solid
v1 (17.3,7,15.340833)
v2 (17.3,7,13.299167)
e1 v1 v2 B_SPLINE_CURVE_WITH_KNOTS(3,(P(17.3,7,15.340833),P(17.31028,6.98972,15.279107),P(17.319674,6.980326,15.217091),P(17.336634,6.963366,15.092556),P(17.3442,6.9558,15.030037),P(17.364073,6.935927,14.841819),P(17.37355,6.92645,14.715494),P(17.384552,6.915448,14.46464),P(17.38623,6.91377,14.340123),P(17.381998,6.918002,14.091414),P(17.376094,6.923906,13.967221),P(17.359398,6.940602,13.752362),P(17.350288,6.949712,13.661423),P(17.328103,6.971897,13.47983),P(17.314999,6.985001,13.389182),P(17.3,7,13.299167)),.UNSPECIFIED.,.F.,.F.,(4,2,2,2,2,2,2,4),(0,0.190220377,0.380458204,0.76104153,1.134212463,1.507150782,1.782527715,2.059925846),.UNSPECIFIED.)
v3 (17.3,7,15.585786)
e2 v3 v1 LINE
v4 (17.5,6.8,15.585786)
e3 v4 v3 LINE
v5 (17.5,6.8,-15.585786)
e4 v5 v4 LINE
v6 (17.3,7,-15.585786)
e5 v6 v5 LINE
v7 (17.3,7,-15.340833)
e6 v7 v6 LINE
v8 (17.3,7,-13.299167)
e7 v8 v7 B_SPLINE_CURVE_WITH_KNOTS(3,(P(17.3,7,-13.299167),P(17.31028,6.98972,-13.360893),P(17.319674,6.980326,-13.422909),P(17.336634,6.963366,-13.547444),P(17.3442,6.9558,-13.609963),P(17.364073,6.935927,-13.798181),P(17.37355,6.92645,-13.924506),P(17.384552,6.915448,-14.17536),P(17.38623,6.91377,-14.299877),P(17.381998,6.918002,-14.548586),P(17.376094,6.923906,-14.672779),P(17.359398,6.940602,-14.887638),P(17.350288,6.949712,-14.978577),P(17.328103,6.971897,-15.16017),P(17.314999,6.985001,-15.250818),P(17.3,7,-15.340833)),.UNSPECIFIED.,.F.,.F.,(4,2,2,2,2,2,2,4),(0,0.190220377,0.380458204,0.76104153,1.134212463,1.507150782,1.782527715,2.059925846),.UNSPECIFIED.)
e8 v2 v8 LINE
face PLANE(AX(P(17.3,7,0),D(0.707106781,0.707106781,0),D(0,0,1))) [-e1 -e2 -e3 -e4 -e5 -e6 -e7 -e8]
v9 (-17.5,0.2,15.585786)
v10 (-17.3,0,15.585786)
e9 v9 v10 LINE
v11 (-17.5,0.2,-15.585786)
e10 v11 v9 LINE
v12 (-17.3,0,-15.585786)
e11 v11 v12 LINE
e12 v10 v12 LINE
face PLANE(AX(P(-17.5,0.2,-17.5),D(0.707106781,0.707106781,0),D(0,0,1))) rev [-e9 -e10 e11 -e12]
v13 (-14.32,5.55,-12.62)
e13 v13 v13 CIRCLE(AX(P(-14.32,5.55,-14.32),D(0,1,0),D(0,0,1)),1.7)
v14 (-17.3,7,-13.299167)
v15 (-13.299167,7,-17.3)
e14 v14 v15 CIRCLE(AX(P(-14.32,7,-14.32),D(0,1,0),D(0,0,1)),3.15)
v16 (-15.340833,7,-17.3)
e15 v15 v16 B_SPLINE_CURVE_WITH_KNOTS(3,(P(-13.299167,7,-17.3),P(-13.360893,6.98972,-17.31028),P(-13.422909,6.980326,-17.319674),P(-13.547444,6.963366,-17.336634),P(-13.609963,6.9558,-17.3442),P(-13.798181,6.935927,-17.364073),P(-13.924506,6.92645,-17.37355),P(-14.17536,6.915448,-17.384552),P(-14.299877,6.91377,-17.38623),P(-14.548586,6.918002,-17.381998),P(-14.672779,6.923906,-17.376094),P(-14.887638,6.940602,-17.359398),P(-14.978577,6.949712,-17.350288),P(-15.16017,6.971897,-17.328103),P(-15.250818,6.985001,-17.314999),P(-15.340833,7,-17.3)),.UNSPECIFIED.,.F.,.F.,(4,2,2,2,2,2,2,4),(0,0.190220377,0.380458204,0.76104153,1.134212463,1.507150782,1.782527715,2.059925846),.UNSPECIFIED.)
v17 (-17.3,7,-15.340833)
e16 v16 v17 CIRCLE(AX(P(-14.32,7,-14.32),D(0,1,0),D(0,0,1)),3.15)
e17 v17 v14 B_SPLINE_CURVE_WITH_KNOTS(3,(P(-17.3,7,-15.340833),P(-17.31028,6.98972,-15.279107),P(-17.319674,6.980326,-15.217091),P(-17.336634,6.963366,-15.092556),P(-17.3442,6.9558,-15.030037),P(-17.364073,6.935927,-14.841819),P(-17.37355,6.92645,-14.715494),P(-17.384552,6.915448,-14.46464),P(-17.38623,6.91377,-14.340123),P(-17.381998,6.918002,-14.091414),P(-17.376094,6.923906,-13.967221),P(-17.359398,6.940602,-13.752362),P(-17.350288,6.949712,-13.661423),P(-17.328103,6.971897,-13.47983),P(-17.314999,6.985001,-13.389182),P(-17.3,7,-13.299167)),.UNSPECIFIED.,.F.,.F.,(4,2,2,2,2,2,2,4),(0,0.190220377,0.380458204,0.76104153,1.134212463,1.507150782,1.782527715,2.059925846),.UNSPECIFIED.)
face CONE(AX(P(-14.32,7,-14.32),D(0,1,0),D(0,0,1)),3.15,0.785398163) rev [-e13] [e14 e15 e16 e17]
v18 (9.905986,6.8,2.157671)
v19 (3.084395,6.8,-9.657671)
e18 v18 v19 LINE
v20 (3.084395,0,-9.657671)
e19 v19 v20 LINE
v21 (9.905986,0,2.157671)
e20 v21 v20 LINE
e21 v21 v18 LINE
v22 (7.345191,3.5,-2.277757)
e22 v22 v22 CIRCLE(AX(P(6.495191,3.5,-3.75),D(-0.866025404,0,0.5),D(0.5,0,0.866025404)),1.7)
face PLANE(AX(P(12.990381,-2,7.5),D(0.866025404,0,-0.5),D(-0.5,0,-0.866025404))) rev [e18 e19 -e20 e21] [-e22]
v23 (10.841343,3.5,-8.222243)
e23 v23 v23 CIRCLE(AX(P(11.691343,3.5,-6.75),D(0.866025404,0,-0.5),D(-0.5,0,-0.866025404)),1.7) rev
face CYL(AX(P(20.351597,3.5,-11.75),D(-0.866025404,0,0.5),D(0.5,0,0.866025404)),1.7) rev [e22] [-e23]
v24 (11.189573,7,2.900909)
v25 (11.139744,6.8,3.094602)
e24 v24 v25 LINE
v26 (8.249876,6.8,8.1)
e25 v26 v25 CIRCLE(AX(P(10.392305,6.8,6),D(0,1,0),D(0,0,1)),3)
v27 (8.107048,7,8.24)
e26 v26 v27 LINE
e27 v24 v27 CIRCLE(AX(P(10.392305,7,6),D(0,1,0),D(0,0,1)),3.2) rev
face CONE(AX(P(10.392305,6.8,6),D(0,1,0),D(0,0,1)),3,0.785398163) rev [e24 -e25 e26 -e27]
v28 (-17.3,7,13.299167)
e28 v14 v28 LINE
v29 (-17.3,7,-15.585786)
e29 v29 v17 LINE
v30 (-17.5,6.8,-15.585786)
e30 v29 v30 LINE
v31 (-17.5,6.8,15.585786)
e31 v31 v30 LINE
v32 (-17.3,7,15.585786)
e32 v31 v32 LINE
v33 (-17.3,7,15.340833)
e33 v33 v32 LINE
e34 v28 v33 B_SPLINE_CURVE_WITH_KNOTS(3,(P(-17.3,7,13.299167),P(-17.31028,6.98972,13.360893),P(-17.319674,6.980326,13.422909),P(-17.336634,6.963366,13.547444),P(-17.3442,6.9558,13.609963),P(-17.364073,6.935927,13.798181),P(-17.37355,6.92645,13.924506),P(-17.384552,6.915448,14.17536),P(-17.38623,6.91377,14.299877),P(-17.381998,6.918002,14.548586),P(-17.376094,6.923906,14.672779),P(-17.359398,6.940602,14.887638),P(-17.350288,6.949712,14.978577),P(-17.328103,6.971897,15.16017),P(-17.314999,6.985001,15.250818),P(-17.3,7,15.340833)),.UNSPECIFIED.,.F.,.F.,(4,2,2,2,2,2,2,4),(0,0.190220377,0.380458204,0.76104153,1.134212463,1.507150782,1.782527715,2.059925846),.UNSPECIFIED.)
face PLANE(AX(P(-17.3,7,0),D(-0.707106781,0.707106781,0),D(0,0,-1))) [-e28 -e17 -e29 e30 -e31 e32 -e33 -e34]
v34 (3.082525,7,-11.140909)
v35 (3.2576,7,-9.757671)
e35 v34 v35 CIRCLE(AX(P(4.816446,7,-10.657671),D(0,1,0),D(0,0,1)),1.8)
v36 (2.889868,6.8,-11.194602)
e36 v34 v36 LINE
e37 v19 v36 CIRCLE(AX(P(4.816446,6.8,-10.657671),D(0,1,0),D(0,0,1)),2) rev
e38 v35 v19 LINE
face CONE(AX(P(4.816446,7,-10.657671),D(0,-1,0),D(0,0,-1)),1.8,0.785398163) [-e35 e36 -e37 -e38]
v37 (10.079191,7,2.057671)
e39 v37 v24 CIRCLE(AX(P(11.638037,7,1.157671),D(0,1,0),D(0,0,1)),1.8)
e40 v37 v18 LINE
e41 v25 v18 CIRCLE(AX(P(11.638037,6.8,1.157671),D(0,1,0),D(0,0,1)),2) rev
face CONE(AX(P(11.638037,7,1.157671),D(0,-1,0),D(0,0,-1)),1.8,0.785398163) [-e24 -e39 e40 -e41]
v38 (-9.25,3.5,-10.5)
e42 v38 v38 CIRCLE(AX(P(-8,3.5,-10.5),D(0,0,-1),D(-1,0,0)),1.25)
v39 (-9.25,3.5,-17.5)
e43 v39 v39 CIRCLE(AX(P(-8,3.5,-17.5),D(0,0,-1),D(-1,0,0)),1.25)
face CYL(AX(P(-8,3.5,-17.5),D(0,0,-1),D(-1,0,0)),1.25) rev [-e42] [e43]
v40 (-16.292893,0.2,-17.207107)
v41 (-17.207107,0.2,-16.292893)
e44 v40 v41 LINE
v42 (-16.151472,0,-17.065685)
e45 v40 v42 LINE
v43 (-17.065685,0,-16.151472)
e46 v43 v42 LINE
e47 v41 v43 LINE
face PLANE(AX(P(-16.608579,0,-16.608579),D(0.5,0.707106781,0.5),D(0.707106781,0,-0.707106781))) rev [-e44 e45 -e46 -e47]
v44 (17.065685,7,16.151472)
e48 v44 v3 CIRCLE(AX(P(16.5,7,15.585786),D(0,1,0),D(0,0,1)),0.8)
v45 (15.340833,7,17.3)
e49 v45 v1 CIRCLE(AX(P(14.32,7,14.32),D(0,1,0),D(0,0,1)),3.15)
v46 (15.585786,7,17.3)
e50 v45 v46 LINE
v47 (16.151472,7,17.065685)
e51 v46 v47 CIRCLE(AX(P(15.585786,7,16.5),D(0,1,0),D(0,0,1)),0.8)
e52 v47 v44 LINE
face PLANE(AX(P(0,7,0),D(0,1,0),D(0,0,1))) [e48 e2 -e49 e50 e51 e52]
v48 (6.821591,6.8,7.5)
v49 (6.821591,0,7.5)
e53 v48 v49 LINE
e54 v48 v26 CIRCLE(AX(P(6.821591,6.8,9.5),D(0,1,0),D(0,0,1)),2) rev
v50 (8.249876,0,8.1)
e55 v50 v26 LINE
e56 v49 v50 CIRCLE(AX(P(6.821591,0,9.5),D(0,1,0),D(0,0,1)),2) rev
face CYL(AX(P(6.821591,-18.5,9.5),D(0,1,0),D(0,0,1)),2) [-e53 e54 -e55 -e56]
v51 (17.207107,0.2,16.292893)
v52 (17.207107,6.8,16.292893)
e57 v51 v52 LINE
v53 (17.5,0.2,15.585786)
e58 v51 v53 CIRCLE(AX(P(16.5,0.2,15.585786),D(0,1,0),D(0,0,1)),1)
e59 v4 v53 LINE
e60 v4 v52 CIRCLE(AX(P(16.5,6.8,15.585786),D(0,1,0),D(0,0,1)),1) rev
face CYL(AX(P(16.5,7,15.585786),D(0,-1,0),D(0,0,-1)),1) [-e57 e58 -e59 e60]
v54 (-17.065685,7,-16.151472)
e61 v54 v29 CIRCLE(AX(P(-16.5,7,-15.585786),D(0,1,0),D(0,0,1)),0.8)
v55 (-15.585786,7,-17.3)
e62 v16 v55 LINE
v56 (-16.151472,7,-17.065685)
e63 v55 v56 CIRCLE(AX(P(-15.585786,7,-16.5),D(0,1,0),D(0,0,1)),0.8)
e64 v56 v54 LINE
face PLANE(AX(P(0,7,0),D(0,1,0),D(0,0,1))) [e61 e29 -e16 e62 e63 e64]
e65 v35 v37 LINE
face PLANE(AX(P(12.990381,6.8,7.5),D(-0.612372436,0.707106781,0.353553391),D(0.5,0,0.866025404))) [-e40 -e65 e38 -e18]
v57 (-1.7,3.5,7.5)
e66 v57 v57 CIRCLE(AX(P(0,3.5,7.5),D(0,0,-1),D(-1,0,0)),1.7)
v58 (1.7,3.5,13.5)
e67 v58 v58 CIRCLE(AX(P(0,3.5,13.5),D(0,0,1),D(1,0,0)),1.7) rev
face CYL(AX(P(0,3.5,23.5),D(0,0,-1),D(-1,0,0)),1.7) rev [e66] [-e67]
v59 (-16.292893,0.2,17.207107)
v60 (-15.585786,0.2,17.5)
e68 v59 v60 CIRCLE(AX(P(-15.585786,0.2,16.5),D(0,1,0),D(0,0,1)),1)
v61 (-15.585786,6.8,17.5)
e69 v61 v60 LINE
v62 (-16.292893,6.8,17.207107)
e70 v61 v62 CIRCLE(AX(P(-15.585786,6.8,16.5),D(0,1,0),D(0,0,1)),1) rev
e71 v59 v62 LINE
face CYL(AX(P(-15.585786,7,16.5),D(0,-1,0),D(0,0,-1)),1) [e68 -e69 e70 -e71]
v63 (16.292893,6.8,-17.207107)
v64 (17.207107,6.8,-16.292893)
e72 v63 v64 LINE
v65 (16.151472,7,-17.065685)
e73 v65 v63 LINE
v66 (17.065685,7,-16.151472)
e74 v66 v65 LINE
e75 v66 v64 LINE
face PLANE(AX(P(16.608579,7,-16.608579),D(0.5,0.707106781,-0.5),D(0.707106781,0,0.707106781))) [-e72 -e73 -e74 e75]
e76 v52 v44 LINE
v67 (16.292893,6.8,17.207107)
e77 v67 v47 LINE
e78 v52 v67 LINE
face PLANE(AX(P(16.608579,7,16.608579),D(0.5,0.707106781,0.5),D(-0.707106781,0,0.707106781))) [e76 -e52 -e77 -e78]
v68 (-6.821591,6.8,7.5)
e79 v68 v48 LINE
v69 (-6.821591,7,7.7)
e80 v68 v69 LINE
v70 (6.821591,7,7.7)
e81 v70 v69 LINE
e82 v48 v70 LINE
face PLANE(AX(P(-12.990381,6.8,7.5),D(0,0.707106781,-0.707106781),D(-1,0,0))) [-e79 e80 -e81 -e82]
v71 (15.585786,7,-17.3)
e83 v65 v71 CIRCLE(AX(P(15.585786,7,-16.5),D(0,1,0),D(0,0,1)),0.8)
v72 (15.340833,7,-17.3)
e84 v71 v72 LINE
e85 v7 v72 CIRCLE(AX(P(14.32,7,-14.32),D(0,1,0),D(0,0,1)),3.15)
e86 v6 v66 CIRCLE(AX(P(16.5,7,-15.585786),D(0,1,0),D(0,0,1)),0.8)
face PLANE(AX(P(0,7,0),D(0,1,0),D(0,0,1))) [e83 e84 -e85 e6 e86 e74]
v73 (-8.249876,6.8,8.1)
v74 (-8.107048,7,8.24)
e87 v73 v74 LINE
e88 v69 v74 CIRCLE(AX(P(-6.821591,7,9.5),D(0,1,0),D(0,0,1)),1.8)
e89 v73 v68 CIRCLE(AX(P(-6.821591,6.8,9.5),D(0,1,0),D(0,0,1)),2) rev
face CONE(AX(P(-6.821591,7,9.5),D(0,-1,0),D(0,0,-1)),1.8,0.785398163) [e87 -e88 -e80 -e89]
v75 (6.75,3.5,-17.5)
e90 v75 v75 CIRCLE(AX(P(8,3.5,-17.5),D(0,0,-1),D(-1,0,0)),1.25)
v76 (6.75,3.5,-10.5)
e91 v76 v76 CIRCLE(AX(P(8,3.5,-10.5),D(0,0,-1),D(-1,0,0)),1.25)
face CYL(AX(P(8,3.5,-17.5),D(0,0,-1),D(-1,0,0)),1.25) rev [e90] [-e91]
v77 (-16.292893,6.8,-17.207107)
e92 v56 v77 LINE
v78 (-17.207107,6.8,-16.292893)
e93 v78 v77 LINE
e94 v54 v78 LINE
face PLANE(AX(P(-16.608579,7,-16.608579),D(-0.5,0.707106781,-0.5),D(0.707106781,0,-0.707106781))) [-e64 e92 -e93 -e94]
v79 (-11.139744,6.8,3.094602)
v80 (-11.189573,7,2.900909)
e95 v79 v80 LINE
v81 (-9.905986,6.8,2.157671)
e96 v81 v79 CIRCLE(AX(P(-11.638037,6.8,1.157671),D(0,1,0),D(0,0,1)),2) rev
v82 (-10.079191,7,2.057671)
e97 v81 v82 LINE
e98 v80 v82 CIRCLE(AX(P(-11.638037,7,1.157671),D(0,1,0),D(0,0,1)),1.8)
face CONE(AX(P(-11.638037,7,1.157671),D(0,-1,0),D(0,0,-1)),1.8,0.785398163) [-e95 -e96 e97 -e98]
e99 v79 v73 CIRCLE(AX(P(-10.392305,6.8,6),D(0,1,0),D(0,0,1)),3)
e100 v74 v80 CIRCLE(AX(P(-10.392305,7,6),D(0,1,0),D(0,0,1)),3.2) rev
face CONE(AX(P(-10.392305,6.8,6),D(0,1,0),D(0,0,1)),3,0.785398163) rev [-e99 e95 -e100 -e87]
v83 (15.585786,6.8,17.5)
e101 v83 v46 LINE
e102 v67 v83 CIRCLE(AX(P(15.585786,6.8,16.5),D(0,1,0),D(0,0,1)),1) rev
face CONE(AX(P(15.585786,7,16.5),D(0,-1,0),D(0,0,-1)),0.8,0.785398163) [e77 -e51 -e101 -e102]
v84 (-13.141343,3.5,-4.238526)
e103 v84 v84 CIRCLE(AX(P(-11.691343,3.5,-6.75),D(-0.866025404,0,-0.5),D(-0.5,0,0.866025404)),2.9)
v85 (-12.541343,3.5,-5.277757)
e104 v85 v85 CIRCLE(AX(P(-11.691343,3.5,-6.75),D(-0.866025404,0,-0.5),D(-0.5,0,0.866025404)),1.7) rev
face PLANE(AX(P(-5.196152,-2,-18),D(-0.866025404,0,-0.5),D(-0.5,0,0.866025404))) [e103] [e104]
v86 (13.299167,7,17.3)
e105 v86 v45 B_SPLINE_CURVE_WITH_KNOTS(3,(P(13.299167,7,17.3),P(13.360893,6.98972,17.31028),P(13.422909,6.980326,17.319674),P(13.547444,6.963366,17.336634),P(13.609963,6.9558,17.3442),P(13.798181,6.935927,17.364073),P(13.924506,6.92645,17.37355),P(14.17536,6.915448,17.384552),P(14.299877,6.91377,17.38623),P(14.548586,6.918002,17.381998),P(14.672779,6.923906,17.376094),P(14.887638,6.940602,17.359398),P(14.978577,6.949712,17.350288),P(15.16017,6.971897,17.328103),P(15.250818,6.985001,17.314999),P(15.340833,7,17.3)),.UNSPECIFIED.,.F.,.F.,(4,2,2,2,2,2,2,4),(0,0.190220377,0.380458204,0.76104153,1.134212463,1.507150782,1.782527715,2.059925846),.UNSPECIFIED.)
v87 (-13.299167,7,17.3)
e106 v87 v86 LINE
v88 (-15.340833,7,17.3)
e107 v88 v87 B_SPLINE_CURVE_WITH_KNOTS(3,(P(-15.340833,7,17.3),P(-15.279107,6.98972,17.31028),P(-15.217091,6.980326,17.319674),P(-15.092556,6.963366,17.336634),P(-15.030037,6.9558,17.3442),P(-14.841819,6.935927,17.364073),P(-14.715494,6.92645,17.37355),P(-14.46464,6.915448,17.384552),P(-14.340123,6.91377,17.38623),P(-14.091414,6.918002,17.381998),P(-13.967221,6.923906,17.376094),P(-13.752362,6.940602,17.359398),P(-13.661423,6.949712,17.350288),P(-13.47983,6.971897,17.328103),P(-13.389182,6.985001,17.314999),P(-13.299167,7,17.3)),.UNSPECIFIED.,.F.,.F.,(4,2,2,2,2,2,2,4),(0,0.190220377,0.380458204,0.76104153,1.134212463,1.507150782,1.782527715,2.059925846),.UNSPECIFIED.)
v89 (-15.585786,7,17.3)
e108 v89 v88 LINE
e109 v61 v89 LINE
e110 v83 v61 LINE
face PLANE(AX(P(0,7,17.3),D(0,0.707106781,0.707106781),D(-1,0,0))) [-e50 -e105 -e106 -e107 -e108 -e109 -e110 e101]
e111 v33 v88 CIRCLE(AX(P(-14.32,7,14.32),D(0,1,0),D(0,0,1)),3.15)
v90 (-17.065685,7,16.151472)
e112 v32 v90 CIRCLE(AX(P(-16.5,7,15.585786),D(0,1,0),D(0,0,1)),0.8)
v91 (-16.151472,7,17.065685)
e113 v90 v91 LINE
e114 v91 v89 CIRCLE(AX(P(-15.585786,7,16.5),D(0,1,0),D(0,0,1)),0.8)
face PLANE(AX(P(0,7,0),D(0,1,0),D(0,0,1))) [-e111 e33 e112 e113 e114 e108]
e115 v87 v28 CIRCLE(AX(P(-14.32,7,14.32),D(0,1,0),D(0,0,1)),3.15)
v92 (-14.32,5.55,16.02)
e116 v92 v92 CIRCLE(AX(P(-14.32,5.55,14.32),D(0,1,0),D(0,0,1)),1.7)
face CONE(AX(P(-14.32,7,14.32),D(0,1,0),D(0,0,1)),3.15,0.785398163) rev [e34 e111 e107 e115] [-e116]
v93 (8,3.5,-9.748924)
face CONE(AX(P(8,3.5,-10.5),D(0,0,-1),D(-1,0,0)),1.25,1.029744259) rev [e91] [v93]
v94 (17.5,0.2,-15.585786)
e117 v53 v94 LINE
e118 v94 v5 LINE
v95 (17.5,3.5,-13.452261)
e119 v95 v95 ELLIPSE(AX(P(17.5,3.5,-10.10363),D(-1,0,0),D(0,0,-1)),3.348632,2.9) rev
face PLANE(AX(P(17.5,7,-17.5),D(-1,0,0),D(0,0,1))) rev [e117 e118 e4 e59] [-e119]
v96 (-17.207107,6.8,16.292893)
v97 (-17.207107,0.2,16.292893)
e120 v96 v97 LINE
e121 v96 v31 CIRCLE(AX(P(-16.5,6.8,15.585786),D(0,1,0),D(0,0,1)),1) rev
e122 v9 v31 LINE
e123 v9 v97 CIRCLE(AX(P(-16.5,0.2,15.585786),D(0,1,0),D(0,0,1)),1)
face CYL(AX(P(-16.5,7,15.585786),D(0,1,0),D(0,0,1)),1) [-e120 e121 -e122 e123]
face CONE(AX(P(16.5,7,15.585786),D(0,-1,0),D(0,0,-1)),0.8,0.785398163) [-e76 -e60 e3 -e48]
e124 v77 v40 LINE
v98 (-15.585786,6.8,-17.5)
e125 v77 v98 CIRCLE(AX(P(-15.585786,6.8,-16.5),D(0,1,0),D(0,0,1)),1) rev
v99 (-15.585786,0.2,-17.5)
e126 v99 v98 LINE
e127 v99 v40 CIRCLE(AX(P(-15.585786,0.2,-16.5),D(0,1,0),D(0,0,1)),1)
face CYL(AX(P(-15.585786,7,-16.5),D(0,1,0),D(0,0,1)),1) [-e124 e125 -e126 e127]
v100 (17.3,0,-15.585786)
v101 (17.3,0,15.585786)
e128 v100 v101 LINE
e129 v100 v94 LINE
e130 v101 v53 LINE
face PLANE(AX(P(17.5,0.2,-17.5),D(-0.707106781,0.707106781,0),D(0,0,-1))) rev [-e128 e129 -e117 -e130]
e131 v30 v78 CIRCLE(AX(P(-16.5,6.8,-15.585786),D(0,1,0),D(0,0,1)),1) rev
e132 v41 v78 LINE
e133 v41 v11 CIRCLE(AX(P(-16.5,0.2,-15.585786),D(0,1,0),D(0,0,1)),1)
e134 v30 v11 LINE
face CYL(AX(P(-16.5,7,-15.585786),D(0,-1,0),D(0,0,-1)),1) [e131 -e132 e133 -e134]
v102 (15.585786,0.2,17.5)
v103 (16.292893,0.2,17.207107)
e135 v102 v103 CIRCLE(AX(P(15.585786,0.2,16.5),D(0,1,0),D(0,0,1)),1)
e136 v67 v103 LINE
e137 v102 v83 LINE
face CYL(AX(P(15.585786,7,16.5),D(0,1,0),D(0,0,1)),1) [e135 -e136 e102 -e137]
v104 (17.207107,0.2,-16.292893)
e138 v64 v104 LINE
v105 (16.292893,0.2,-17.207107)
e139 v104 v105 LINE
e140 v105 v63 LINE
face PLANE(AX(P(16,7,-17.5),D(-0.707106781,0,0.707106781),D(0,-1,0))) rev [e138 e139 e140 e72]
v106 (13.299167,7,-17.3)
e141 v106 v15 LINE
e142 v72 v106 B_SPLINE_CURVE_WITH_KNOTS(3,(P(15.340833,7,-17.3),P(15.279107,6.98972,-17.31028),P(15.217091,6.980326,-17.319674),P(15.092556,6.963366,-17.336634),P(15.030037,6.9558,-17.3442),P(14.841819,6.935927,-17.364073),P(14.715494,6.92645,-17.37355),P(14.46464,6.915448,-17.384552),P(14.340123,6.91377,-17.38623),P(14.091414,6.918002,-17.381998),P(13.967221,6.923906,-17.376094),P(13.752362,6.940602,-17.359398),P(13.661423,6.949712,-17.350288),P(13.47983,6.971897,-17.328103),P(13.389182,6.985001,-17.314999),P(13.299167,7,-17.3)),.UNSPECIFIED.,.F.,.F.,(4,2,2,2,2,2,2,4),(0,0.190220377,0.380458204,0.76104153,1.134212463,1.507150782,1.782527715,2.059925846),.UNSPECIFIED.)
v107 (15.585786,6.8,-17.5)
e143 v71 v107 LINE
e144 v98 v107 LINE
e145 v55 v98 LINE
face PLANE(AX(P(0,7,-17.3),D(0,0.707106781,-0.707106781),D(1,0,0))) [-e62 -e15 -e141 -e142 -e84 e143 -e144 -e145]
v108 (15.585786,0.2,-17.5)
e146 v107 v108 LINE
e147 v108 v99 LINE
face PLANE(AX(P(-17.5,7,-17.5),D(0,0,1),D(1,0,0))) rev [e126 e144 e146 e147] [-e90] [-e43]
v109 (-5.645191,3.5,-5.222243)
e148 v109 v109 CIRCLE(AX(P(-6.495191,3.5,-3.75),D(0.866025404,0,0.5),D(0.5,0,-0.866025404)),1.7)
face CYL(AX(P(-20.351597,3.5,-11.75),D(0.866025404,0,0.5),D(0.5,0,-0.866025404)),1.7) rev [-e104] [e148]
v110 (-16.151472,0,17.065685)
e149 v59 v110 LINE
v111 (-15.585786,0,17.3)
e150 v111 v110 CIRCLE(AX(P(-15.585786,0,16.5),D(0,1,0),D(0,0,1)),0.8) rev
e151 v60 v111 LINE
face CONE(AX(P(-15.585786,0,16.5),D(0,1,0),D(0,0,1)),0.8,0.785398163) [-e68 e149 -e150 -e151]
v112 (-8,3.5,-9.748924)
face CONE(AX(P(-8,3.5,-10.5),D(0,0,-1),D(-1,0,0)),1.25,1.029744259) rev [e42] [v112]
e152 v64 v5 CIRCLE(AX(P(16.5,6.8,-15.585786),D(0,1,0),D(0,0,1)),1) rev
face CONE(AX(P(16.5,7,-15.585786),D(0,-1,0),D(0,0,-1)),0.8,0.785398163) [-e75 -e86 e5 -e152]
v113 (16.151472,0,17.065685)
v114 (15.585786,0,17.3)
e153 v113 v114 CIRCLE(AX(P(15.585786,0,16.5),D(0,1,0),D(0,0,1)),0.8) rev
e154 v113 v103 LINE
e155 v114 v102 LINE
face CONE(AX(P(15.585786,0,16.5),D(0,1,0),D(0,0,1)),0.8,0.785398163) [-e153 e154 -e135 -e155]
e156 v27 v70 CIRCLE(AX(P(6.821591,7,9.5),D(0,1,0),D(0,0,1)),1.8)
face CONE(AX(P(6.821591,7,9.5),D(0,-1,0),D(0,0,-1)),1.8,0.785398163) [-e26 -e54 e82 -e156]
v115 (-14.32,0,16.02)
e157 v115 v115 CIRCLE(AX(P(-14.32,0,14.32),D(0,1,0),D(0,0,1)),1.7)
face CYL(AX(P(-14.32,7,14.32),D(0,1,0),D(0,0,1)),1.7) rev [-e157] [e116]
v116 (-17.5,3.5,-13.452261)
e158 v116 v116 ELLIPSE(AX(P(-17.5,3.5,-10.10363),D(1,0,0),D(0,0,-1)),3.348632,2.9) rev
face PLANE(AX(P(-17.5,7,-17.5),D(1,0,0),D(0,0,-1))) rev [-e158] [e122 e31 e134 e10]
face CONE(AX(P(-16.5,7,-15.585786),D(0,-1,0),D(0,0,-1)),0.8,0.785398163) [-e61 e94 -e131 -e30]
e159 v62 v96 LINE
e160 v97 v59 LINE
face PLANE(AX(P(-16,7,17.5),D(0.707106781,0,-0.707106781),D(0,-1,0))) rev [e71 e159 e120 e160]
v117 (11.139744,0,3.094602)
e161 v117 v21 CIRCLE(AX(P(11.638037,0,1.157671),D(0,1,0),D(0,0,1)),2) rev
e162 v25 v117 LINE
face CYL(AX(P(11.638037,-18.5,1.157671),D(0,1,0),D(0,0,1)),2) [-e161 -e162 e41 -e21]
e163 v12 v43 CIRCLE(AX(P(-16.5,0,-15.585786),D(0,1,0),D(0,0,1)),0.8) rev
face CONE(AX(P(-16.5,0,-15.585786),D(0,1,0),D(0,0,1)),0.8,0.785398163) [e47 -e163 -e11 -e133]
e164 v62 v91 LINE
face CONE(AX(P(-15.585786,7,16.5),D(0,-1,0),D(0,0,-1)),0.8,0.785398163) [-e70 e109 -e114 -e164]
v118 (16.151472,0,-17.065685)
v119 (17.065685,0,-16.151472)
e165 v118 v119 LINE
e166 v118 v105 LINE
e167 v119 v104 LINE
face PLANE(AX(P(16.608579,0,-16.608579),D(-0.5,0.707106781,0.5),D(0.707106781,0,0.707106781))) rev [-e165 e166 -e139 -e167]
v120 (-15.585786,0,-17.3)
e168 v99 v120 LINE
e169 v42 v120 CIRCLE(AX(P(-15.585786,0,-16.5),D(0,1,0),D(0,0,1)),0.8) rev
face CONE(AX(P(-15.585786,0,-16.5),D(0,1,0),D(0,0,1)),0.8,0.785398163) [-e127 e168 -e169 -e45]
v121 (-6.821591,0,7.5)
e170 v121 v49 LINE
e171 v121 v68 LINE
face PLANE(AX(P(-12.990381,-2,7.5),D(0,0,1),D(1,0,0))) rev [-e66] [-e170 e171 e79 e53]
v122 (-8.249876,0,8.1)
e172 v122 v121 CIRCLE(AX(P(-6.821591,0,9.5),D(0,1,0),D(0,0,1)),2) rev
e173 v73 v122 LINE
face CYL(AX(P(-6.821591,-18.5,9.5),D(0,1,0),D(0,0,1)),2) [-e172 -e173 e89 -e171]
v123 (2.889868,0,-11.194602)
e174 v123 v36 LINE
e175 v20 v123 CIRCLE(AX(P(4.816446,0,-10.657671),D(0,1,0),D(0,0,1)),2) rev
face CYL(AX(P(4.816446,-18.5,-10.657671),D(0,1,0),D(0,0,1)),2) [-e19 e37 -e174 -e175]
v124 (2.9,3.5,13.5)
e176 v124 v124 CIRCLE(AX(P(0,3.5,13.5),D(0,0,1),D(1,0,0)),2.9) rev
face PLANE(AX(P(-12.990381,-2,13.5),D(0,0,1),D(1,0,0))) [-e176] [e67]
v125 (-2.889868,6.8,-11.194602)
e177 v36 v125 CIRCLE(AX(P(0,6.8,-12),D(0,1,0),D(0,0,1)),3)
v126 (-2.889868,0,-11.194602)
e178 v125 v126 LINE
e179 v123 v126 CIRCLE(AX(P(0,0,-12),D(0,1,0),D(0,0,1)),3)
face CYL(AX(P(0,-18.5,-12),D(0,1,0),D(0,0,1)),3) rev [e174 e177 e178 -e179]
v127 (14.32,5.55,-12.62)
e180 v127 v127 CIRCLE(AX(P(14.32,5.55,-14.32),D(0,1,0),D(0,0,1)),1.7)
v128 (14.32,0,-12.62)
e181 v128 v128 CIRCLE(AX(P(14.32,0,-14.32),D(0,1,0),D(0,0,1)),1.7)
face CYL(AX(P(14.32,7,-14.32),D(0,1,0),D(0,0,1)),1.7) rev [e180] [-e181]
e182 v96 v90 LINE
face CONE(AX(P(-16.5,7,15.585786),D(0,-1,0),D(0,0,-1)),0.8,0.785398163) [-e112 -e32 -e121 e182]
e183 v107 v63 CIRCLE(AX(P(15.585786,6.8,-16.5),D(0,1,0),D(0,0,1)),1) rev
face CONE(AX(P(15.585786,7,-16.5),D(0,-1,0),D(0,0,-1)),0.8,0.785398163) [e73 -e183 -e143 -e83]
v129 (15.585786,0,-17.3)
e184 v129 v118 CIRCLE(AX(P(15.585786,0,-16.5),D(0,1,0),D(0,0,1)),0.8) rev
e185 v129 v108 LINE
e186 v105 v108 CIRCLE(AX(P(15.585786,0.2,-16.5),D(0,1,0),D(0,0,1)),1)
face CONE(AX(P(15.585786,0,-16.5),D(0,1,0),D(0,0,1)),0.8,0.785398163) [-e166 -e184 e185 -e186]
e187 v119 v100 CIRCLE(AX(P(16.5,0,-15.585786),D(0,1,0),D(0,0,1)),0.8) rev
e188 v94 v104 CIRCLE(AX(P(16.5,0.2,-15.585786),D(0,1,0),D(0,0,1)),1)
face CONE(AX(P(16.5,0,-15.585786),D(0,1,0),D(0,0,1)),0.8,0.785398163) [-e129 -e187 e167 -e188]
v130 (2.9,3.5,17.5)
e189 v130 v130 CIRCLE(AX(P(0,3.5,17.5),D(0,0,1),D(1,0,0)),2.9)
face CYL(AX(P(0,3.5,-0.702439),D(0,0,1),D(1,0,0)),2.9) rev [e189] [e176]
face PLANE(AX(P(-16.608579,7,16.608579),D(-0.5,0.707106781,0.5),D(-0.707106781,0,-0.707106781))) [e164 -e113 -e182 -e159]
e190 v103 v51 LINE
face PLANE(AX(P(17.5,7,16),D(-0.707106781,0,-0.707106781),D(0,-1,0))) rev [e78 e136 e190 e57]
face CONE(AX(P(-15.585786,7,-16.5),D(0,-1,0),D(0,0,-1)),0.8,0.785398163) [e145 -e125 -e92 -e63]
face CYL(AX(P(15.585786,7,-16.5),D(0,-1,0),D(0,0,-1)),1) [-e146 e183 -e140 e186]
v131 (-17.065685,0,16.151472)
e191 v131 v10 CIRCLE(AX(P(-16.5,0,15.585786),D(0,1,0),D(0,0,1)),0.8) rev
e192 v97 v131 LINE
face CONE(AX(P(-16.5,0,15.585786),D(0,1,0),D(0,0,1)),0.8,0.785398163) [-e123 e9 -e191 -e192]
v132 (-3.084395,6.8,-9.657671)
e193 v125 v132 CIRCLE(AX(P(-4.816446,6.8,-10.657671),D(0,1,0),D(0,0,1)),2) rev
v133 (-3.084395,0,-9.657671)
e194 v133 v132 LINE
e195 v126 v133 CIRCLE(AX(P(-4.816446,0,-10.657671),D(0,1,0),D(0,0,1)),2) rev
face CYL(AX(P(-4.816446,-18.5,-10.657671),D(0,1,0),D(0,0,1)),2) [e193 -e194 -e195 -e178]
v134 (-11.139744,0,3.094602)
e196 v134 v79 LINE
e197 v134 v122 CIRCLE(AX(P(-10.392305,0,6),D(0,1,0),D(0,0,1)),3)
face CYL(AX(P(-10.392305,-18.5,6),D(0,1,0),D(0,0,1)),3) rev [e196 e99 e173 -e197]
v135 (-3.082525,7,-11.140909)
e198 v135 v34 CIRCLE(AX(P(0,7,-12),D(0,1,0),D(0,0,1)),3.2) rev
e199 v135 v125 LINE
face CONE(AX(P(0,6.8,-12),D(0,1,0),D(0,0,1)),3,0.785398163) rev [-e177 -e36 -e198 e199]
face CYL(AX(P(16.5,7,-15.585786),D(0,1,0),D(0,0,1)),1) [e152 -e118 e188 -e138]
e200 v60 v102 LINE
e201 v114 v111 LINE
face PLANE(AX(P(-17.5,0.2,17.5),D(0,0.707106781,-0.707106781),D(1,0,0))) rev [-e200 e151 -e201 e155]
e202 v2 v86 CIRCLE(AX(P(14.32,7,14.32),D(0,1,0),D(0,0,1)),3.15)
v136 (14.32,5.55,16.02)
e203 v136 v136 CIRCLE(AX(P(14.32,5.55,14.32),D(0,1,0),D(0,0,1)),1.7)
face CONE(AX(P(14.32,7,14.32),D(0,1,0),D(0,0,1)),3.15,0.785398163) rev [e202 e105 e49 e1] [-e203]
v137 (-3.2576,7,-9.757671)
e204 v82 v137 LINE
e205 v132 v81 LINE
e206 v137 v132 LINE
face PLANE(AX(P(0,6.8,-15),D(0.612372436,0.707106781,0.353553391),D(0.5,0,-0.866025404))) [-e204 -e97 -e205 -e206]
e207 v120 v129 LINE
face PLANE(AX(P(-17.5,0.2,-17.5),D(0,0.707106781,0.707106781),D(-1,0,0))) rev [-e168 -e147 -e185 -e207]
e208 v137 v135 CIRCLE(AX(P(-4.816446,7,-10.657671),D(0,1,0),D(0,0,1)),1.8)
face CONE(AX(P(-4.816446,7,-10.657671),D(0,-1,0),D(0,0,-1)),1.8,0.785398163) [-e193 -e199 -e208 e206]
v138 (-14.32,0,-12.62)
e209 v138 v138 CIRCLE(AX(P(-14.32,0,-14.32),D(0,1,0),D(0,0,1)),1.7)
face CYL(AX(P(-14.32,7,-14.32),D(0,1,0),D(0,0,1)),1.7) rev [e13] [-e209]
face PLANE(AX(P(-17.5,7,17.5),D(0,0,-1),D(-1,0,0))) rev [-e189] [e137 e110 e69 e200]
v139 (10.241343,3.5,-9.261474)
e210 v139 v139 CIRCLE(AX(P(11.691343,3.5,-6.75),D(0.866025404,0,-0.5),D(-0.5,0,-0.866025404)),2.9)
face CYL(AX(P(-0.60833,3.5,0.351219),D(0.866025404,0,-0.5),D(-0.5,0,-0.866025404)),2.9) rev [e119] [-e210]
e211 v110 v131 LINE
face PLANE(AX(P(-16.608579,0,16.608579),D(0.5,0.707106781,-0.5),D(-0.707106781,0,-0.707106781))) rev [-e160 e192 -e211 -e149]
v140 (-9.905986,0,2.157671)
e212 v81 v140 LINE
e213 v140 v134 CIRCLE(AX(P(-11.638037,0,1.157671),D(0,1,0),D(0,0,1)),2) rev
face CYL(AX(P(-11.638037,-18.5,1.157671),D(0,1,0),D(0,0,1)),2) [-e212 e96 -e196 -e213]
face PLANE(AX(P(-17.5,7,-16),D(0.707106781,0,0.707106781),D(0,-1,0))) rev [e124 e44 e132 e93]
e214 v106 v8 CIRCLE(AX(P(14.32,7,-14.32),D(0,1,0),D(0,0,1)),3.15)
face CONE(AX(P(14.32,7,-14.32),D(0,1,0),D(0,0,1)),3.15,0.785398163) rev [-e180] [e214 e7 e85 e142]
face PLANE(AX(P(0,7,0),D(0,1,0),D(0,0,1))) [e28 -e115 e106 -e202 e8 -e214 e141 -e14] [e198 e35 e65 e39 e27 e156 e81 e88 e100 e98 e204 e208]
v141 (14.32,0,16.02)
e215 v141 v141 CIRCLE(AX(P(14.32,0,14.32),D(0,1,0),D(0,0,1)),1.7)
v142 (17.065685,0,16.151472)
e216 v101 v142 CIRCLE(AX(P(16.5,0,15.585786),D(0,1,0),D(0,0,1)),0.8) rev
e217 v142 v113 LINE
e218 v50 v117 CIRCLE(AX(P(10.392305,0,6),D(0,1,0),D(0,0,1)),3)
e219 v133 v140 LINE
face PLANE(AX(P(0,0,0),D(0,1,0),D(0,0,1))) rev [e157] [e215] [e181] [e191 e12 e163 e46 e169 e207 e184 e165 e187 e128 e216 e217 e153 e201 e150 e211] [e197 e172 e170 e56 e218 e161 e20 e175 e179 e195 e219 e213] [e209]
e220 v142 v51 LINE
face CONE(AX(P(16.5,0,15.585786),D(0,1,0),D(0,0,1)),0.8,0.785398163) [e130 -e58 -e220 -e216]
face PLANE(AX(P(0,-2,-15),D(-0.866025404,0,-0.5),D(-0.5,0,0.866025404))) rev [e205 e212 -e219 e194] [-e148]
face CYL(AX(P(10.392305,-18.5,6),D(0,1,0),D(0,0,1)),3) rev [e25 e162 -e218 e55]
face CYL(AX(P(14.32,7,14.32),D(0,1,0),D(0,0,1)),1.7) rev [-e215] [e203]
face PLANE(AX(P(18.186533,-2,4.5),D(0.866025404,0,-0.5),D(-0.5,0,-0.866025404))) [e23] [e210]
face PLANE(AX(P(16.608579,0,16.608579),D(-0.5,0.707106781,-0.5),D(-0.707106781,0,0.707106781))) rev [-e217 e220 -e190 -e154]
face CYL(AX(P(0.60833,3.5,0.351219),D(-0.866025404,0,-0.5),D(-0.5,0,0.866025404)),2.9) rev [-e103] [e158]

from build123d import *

# Parameters (mm, degrees)
SKETCH_36_W                  = 35
SKETCH_36_H                  = 35
EXTRUDE_8_DEPTH              = 7
SKETCH_37_R                  = 1
CUT_EXTRUDE_8_DEPTH          = 14
HOLE_WIZARD_M3_2_D           = 3.4
HOLE_WIZARD_M3_2_CSINK_D     = 6.3
HOLE_WIZARD_M3_2_CSINK_ANGLE = 90
CUT_EXTRUDE_9_DEPTH          = 9
FILLET_8_R                   = 3
SKETCH_41_R                  = 3
CUT_EXTRUDE_10_DEPTH         = 25.5
CHAMFER_3_SIZE               = 1.5
FILLET_9_R                   = 1
SKETCH_44_R                  = 1.7
CUT_EXTRUDE_11_DEPTH         = 16
PATTERN_CIRCULAR_4_COUNT     = 3
SKETCH_46_R                  = 2.9
CUT_EXTRUDE_12_DEPTH         = 9
SKETCH_47_R                  = 2.9
CUT_EXTRUDE_13_DEPTH         = 9
SKETCH_48_R                  = 2.9
CUT_EXTRUDE_14_DEPTH         = 4
FILLET_10_R                  = 2
SKETCH_49_R                  = 1
CUT_EXTRUDE_15_DEPTH         = 6
HOLE_WIZARD_M3_1_D           = 2.5
HOLE_WIZARD_M3_1_DEPTH       = 7
HOLE_WIZARD_M3_1_TIP         = 0.751075774
CHAMFER_4_SIZE               = 0.2
CHAMFER_5_SIZE               = 0.2


with BuildPart() as part:
    # 草图36 → 凸台-拉伸8 (new body)
    with BuildSketch(Plane(origin=(0, 0, 0), x_dir=(1, 0, 0), z_dir=(0, 1, 0))):
        Rectangle(SKETCH_36_W, SKETCH_36_H)
    extrude(amount=EXTRUDE_8_DEPTH)

    # 草图37 → 切除-拉伸8 (cut)
    with BuildSketch(Plane(origin=(0, 7, 0), x_dir=(1, 0, 0), z_dir=(0, 1, 0))):
        with Locations(Location((-14.32, 14.32, 0), (0, 0, 270))):
            Circle(SKETCH_37_R)
        with Locations(Location((14.32, 14.32, 0), (0, 0, 270))):
            Circle(SKETCH_37_R)
        with Locations(Location((14.32, -14.32, 0), (0, 0, 270))):
            Circle(SKETCH_37_R)
        with Locations(Location((-14.32, -14.32, 0), (0, 0, 270))):
            Circle(SKETCH_37_R)
    extrude(amount=-CUT_EXTRUDE_8_DEPTH, mode=Mode.SUBTRACT)

    # M3 十字槽半沉头木螺钉的锥形沉头孔2 (through all)
    with Locations(Plane(origin=(0, 7, 0), x_dir=(1, 0, 0), z_dir=(0, 1, 0))):
        with Locations((-14.32, 14.32), (-14.32, -14.32), (14.32, -14.32), (14.32, 14.32)):
            CounterSinkHole(HOLE_WIZARD_M3_2_D / 2, HOLE_WIZARD_M3_2_CSINK_D / 2, counter_sink_angle=HOLE_WIZARD_M3_2_CSINK_ANGLE)

    # 草图40 → 切除-拉伸9 (cut)
    with BuildSketch(Plane(origin=(0, 7, 0), x_dir=(1, 0, 0), z_dir=(0, 1, 0))):
        Polygon((0, 15), (-12.990381057, -7.5), (12.990381057, -7.5), align=None)
    extrude(amount=-CUT_EXTRUDE_9_DEPTH, mode=Mode.SUBTRACT)

    # 圆角8
    fillet_8_edges = [part.edges().sort_by_distance(p)[0] for p in [
        (0, 3.5, -15),
        (12.990381057, 3.5, 7.5),
        (-12.990381057, 3.5, 7.5),
    ]]
    fillet(fillet_8_edges, radius=FILLET_8_R)

    # 草图41 → 切除-拉伸10 (cut)
    with BuildSketch(Plane(origin=(0, 7, 0), x_dir=(1, 0, 0), z_dir=(0, 1, 0))):
        with Locations((0, 12)):
            Circle(SKETCH_41_R)
        with Locations((10.392304845, -6)):
            Circle(SKETCH_41_R)
        with Locations((-10.392304845, -6)):
            Circle(SKETCH_41_R)
    extrude(amount=-CUT_EXTRUDE_10_DEPTH, mode=Mode.SUBTRACT)

    # 倒角3
    chamfer_3_edges = [part.edges().sort_by_distance(p)[0] for p in [
        (17.5, 3.5, 17.5),
        (-17.5, 3.5, 17.5),
        (-17.5, 3.5, -17.5),
        (17.5, 3.5, -17.5),
    ]]
    chamfer(chamfer_3_edges, length=CHAMFER_3_SIZE)

    # 圆角9
    fillet_9_edges = [part.edges().sort_by_distance(p)[0] for p in [
        (16, 3.5, 17.5),
        (-16, 3.5, 17.5),
        (-17.5, 3.5, -16),
        (-17.5, 3.5, 16),
        (17.5, 3.5, -16),
        (17.5, 3.5, 16),
        (16, 3.5, -17.5),
        (-16, 3.5, -17.5),
    ]]
    fillet(fillet_9_edges, radius=FILLET_9_R)

    # 草图44 → 切除-拉伸11 (cut)
    with BuildSketch(Plane(origin=(-6.495190528, 0, -3.75), x_dir=(0.5000000000000003, 0, -0.8660254037844386), z_dir=(0.8660254037844386, 0, 0.5000000000000003))):
        with Locations((0, 3.5)):
            Circle(SKETCH_44_R)
    cut_extrude_11 = extrude(amount=-CUT_EXTRUDE_11_DEPTH, mode=Mode.SUBTRACT)

    # 阵列(圆周)4: 切除-拉伸11 ×3 about axis
    pattern_circular_4_axis = Axis((0, 61.25, 0), (0, -1, 0))
    for i in range(1, PATTERN_CIRCULAR_4_COUNT):
        add(cut_extrude_11.rotate(pattern_circular_4_axis, i * 360 / PATTERN_CIRCULAR_4_COUNT), mode=Mode.SUBTRACT)

    # 草图46 → 切除-拉伸12 (cut)
    with BuildSketch(Plane(origin=(-19.485571585, 0, -11.25), x_dir=(0.5000000000000003, 0, -0.8660254037844386), z_dir=(0.8660254037844386, 0, 0.5000000000000003))):
        with Locations(Location((0, 3.5, 0), (0, 0, 180))):
            Circle(SKETCH_46_R)
    extrude(amount=CUT_EXTRUDE_12_DEPTH, mode=Mode.SUBTRACT)

    # 草图47 → 切除-拉伸13 (cut)
    with BuildSketch(Plane(origin=(19.485571585, 0, -11.25), x_dir=(0.5000000000000003, 0, 0.8660254037844386), z_dir=(-0.8660254037844386, 0, 0.5000000000000003))):
        with Locations(Location((0, 3.5, 0), (0, 0, 180))):
            Circle(SKETCH_47_R)
    extrude(amount=CUT_EXTRUDE_13_DEPTH, mode=Mode.SUBTRACT)

    # 草图48 → 切除-拉伸14 (cut)
    with BuildSketch(Plane.XY.offset(17.5)):
        with Locations((0, 3.5)):
            Circle(SKETCH_48_R)
    extrude(amount=-CUT_EXTRUDE_14_DEPTH, mode=Mode.SUBTRACT)

    # 圆角10
    fillet_10_edges = [part.edges().sort_by_distance(p)[0] for p in [
        (2.598076211, 3.5, -10.5),
        (10.392304845, 3.5, 3),
        (-7.794228634, 3.5, 7.5),
        (7.794228634, 3.5, 7.5),
        (-2.598076211, 3.5, -10.5),
        (-10.392304845, 3.5, 3),
    ]]
    fillet(fillet_10_edges, radius=FILLET_10_R)

    # 草图49 → 切除-拉伸15 (cut)
    with BuildSketch(Plane(origin=(0, 0, -17.5), x_dir=(-1, 0, 0), z_dir=(0, 0, -1))):
        with Locations((-8, 3.5)):
            Circle(SKETCH_49_R)
        with Locations(Location((8, 3.5, 0), (0, 0, 180))):
            Circle(SKETCH_49_R)
    extrude(amount=-CUT_EXTRUDE_15_DEPTH, mode=Mode.SUBTRACT)

    # M3 螺纹孔1
    with Locations(Plane(origin=(0, 0, -17.5), x_dir=(-1, 0, 0), z_dir=(0, 0, -1))):
        with Locations((-8, 3.5), (8, 3.5)):
            Hole(HOLE_WIZARD_M3_1_D / 2, depth=HOLE_WIZARD_M3_1_DEPTH)
            with Locations((0, 0, -(HOLE_WIZARD_M3_1_DEPTH + HOLE_WIZARD_M3_1_TIP / 2))):  # 118° drill point
                Cone(0, HOLE_WIZARD_M3_1_D / 2, HOLE_WIZARD_M3_1_TIP, mode=Mode.SUBTRACT)

    # 倒角4
    # the kernel refuses this chamfer: 0.2 mm, written as the material it takes off along each edge
    with BuildSketch(Plane(origin=(-17.5, 0, 15.585786438), x_dir=(0.9996219169112968, -0.02749587661058673, 0), z_dir=(0, 0, -1)), Plane(origin=(-17.5, 7, 15.585786438), x_dir=(-0.027495876610578673, -0.999621916911297, 0), z_dir=(0, 0, -1)), Plane(origin=(15.585786438, 7, 17.5), x_dir=(0, -0.999621916911297, 0.027495876610578673), z_dir=(-1, 0, 0)), Plane(origin=(17.5, 7, -15.585786438), x_dir=(0.027495876610578673, -0.999621916911297, 0), z_dir=(0, 0, 1)), Plane(origin=(-15.585786438, 7, -17.5), x_dir=(0, -0.999621916911297, -0.027495876610578673), z_dir=(1, 0, 0)), Plane(origin=(15.585786438, 0, 17.5), x_dir=(0, -0.027495876610586726, -0.9996219169112966), z_dir=(-1, 0, 0)), Plane(origin=(-15.585786438, 0, -17.5), x_dir=(0, -0.027495876610586726, 0.9996219169112966), z_dir=(1, 0, 0)), Plane(origin=(17.5, 0, -15.585786438), x_dir=(-0.9996219169112968, -0.02749587661058673, 0), z_dir=(0, 0, 1))) as chamfer_4_piece_1:
        Polygon((CHAMFER_4_SIZE * 0.999621916911, -CHAMFER_4_SIZE * 0.0274958766106), (-CHAMFER_4_SIZE * 0.0274958766106, -CHAMFER_4_SIZE * 0.999621916911), (0, 0), align=None)
    extrude(amount=31.171572875, mode=Mode.SUBTRACT)
    with BuildSketch(Plane(origin=(-17.207106781, 7, 16.292893219), x_dir=(-0.019442520806012033, -0.9996219169112968, 0.019442520806012033), z_dir=(0.7071067811865476, 0, 0.7071067811865476)), Plane(origin=(16.292893219, 7, 17.207106781), x_dir=(0.019442520806020658, -0.9996219169112964, 0.019442520806020658), z_dir=(0.7071067811865476, 0, -0.7071067811865476)), Plane(origin=(17.207106781, 7, -16.292893219), x_dir=(0.019442520806020658, -0.9996219169112964, -0.019442520806020658), z_dir=(-0.7071067811865476, 0, -0.7071067811865476)), Plane(origin=(-17.207106781, 0, 16.292893219), x_dir=(0.7068394360706735, -0.027495876610586372, -0.7068394360706735), z_dir=(0.7071067811865476, 0, 0.7071067811865476)), Plane(origin=(17.207106781, 0, -16.292893219), x_dir=(-0.7068394360706735, -0.0274958766105862, 0.7068394360706735), z_dir=(-0.7071067811865476, 0, -0.7071067811865476)), Plane(origin=(16.292893219, 0, 17.207106781), x_dir=(-0.7068394360706735, -0.0274958766105862, -0.7068394360706735), z_dir=(0.7071067811865476, 0, -0.7071067811865476))) as chamfer_4_piece_2:
        Polygon((CHAMFER_4_SIZE * 0.999621916911, CHAMFER_4_SIZE * 0.0274958766106), (-CHAMFER_4_SIZE * 0.0274958766106, CHAMFER_4_SIZE * 0.999621916911), (0, 0), align=None)
    extrude(amount=1.292893219, mode=Mode.SUBTRACT)
    with BuildSketch(Plane(origin=(-17.207106781, 7, -16.292893219), x_dir=(-0.019442520806012033, -0.9996219169112968, -0.019442520806012033), z_dir=(0.7071067811865476, 0, -0.7071067811865476)), Plane(origin=(-17.207106781, 0, -16.292893219), x_dir=(0.7068394360706735, -0.027495876610586372, 0.7068394360706735), z_dir=(0.7071067811865476, 0, -0.7071067811865476))) as chamfer_4_piece_3:
        Polygon((CHAMFER_4_SIZE * 0.999621916911, -CHAMFER_4_SIZE * 0.0274958766106), (-CHAMFER_4_SIZE * 0.0274958766106, -CHAMFER_4_SIZE * 0.999621916911), (0, 0), align=None)
    extrude(amount=1.292893219, mode=Mode.SUBTRACT)
    with BuildSketch(Plane(origin=(-15.585786438, 7, -16.5), x_dir=(0, 0, -1), z_dir=(1, 0, 0))) as chamfer_4_piece_4:
        Polygon((1, -CHAMFER_4_SIZE), (1 - CHAMFER_4_SIZE, 0), (1, 0), align=None)
    revolve(axis=Axis((-15.585786438, 7, -16.5), (0, 1, 0)), revolution_arc=45, mode=Mode.SUBTRACT)
    with BuildSketch(Plane(origin=(-16.5, 7, -15.585786438), x_dir=(-0.7071067811865476, 0, -0.7071067811865476), z_dir=(0.7071067811865476, 0, -0.7071067811865476))) as chamfer_4_piece_5:
        Polygon((1, -CHAMFER_4_SIZE), (1 - CHAMFER_4_SIZE, 0), (1, 0), align=None)
    revolve(axis=Axis((-16.5, 7, -15.585786438), (0, 1, 0)), revolution_arc=45, mode=Mode.SUBTRACT)
    with BuildSketch(Plane(origin=(15.585786438, 7, -16.5), x_dir=(0, 0, -1), z_dir=(-1, 0, 0))) as chamfer_4_piece_6:
        Polygon((1, CHAMFER_4_SIZE), (1 - CHAMFER_4_SIZE, 0), (1, 0), align=None)
    revolve(axis=Axis((15.585786438, 7, -16.5), (0, -1, 0)), revolution_arc=45, mode=Mode.SUBTRACT)
    with BuildSketch(Plane(origin=(16.5, 7, -15.585786438), x_dir=(0.7071067811865458, 0, -0.7071067811865493), z_dir=(-0.7071067811865493, 0, -0.7071067811865458))) as chamfer_4_piece_7:
        Polygon((1, CHAMFER_4_SIZE), (1 - CHAMFER_4_SIZE, 0), (1, 0), align=None)
    revolve(axis=Axis((16.5, 7, -15.585786438), (0, -1, 0)), revolution_arc=45, mode=Mode.SUBTRACT)
    with BuildSketch(Plane(origin=(16.5, 7, 15.585786438), x_dir=(1, 0, 0), z_dir=(0, 0, -1))) as chamfer_4_piece_8:
        Polygon((1, CHAMFER_4_SIZE), (1 - CHAMFER_4_SIZE, 0), (1, 0), align=None)
    revolve(axis=Axis((16.5, 7, 15.585786438), (0, -1, 0)), revolution_arc=45, mode=Mode.SUBTRACT)
    with BuildSketch(Plane(origin=(15.585786438, 7, 16.5), x_dir=(0.7071067811865476, 0, 0.7071067811865476), z_dir=(0.7071067811865476, 0, -0.7071067811865476))) as chamfer_4_piece_9:
        Polygon((1, CHAMFER_4_SIZE), (1 - CHAMFER_4_SIZE, 0), (1, 0), align=None)
    revolve(axis=Axis((15.585786438, 7, 16.5), (0, -1, 0)), revolution_arc=45, mode=Mode.SUBTRACT)
    with BuildSketch(Plane(origin=(-15.585786438, 7, 16.5), x_dir=(-0.7071067811865476, 0, 0.7071067811865476), z_dir=(-0.7071067811865476, 0, -0.7071067811865476))) as chamfer_4_piece_10:
        Polygon((1, -CHAMFER_4_SIZE), (1 - CHAMFER_4_SIZE, 0), (1, 0), align=None)
    revolve(axis=Axis((-15.585786438, 7, 16.5), (0, 1, 0)), revolution_arc=45, mode=Mode.SUBTRACT)
    with BuildSketch(Plane(origin=(-16.5, 7, 15.585786438), x_dir=(-1, 0, 0), z_dir=(0, 0, -1))) as chamfer_4_piece_11:
        Polygon((1, -CHAMFER_4_SIZE), (1 - CHAMFER_4_SIZE, 0), (1, 0), align=None)
    revolve(axis=Axis((-16.5, 7, 15.585786438), (0, 1, 0)), revolution_arc=45, mode=Mode.SUBTRACT)
    with BuildSketch(Plane(origin=(-15.585786438, 0, -16.5), x_dir=(0, 0, -1), z_dir=(1, 0, 0))) as chamfer_4_piece_12:
        Polygon((1 - CHAMFER_4_SIZE, 0), (1, CHAMFER_4_SIZE), (1, 0), align=None)
    revolve(axis=Axis((-15.585786438, 0, -16.5), (0, 1, 0)), revolution_arc=45, mode=Mode.SUBTRACT)
    with BuildSketch(Plane(origin=(-16.5, 0, -15.585786438), x_dir=(-0.7071067811865476, 0, -0.7071067811865476), z_dir=(0.7071067811865476, 0, -0.7071067811865476))) as chamfer_4_piece_13:
        Polygon((1 - CHAMFER_4_SIZE, 0), (1, CHAMFER_4_SIZE), (1, 0), align=None)
    revolve(axis=Axis((-16.5, 0, -15.585786438), (0, 1, 0)), revolution_arc=45, mode=Mode.SUBTRACT)
    with BuildSketch(Plane(origin=(15.585786438, 0, -16.5), x_dir=(0, 0, -1), z_dir=(-1, 0, 0))) as chamfer_4_piece_14:
        Polygon((1 - CHAMFER_4_SIZE, 0), (1, -CHAMFER_4_SIZE), (1, 0), align=None)
    revolve(axis=Axis((15.585786438, 0, -16.5), (0, -1, 0)), revolution_arc=45, mode=Mode.SUBTRACT)
    with BuildSketch(Plane(origin=(16.5, 0, -15.585786438), x_dir=(0.7071067811865476, 0, -0.7071067811865476), z_dir=(-0.7071067811865476, 0, -0.7071067811865476))) as chamfer_4_piece_15:
        Polygon((1 - CHAMFER_4_SIZE, 0), (1, -CHAMFER_4_SIZE), (1, 0), align=None)
    revolve(axis=Axis((16.5, 0, -15.585786438), (0, -1, 0)), revolution_arc=45, mode=Mode.SUBTRACT)
    with BuildSketch(Plane(origin=(16.5, 0, 15.585786438), x_dir=(1, 0, 0), z_dir=(0, 0, -1))) as chamfer_4_piece_16:
        Polygon((1 - CHAMFER_4_SIZE, 0), (1, -CHAMFER_4_SIZE), (1, 0), align=None)
    revolve(axis=Axis((16.5, 0, 15.585786438), (0, -1, 0)), revolution_arc=45, mode=Mode.SUBTRACT)
    with BuildSketch(Plane(origin=(15.585786438, 0, 16.5), x_dir=(0.7071067811865493, 0, 0.7071067811865458), z_dir=(0.7071067811865458, 0, -0.7071067811865493))) as chamfer_4_piece_17:
        Polygon((1 - CHAMFER_4_SIZE, 0), (1, -CHAMFER_4_SIZE), (1, 0), align=None)
    revolve(axis=Axis((15.585786438, 0, 16.5), (0, -1, 0)), revolution_arc=45, mode=Mode.SUBTRACT)
    with BuildSketch(Plane(origin=(-15.585786438, 0, 16.5), x_dir=(-0.7071067811865476, 0, 0.7071067811865476), z_dir=(-0.7071067811865476, 0, -0.7071067811865476))) as chamfer_4_piece_18:
        Polygon((1 - CHAMFER_4_SIZE, 0), (1, CHAMFER_4_SIZE), (1, 0), align=None)
    revolve(axis=Axis((-15.585786438, 0, 16.5), (0, 1, 0)), revolution_arc=45, mode=Mode.SUBTRACT)
    with BuildSketch(Plane(origin=(-16.5, 0, 15.585786438), x_dir=(-1, 0, 0), z_dir=(0, 0, -1))) as chamfer_4_piece_19:
        Polygon((1 - CHAMFER_4_SIZE, 0), (1, CHAMFER_4_SIZE), (1, 0), align=None)
    revolve(axis=Axis((-16.5, 0, 15.585786438), (0, 1, 0)), revolution_arc=45, mode=Mode.SUBTRACT)

    # 倒角5
    chamfer_5_edges = [part.edges().sort_by_distance(p)[0] for p in [
        (0, 7, 7.5),
        (12.990381057, 7, 7.5),
        (0, 7, -15),
        (6.495190528, 7, -3.75),
        (-12.990381057, 7, 7.5),
        (-6.495190528, 7, -3.75),
        (2.832275743, 7, -10.406536728),
        (10.428463044, 7, 2.75044562),
        (-10.428463044, 7, 2.75044562),
        (-2.832275743, 7, -10.406536728),
        (-7.5961873, 7, 7.656091109),
        (7.5961873, 7, 7.656091109),
    ]]
    chamfer(chamfer_5_edges, length=CHAMFER_5_SIZE)


solid = part.part
